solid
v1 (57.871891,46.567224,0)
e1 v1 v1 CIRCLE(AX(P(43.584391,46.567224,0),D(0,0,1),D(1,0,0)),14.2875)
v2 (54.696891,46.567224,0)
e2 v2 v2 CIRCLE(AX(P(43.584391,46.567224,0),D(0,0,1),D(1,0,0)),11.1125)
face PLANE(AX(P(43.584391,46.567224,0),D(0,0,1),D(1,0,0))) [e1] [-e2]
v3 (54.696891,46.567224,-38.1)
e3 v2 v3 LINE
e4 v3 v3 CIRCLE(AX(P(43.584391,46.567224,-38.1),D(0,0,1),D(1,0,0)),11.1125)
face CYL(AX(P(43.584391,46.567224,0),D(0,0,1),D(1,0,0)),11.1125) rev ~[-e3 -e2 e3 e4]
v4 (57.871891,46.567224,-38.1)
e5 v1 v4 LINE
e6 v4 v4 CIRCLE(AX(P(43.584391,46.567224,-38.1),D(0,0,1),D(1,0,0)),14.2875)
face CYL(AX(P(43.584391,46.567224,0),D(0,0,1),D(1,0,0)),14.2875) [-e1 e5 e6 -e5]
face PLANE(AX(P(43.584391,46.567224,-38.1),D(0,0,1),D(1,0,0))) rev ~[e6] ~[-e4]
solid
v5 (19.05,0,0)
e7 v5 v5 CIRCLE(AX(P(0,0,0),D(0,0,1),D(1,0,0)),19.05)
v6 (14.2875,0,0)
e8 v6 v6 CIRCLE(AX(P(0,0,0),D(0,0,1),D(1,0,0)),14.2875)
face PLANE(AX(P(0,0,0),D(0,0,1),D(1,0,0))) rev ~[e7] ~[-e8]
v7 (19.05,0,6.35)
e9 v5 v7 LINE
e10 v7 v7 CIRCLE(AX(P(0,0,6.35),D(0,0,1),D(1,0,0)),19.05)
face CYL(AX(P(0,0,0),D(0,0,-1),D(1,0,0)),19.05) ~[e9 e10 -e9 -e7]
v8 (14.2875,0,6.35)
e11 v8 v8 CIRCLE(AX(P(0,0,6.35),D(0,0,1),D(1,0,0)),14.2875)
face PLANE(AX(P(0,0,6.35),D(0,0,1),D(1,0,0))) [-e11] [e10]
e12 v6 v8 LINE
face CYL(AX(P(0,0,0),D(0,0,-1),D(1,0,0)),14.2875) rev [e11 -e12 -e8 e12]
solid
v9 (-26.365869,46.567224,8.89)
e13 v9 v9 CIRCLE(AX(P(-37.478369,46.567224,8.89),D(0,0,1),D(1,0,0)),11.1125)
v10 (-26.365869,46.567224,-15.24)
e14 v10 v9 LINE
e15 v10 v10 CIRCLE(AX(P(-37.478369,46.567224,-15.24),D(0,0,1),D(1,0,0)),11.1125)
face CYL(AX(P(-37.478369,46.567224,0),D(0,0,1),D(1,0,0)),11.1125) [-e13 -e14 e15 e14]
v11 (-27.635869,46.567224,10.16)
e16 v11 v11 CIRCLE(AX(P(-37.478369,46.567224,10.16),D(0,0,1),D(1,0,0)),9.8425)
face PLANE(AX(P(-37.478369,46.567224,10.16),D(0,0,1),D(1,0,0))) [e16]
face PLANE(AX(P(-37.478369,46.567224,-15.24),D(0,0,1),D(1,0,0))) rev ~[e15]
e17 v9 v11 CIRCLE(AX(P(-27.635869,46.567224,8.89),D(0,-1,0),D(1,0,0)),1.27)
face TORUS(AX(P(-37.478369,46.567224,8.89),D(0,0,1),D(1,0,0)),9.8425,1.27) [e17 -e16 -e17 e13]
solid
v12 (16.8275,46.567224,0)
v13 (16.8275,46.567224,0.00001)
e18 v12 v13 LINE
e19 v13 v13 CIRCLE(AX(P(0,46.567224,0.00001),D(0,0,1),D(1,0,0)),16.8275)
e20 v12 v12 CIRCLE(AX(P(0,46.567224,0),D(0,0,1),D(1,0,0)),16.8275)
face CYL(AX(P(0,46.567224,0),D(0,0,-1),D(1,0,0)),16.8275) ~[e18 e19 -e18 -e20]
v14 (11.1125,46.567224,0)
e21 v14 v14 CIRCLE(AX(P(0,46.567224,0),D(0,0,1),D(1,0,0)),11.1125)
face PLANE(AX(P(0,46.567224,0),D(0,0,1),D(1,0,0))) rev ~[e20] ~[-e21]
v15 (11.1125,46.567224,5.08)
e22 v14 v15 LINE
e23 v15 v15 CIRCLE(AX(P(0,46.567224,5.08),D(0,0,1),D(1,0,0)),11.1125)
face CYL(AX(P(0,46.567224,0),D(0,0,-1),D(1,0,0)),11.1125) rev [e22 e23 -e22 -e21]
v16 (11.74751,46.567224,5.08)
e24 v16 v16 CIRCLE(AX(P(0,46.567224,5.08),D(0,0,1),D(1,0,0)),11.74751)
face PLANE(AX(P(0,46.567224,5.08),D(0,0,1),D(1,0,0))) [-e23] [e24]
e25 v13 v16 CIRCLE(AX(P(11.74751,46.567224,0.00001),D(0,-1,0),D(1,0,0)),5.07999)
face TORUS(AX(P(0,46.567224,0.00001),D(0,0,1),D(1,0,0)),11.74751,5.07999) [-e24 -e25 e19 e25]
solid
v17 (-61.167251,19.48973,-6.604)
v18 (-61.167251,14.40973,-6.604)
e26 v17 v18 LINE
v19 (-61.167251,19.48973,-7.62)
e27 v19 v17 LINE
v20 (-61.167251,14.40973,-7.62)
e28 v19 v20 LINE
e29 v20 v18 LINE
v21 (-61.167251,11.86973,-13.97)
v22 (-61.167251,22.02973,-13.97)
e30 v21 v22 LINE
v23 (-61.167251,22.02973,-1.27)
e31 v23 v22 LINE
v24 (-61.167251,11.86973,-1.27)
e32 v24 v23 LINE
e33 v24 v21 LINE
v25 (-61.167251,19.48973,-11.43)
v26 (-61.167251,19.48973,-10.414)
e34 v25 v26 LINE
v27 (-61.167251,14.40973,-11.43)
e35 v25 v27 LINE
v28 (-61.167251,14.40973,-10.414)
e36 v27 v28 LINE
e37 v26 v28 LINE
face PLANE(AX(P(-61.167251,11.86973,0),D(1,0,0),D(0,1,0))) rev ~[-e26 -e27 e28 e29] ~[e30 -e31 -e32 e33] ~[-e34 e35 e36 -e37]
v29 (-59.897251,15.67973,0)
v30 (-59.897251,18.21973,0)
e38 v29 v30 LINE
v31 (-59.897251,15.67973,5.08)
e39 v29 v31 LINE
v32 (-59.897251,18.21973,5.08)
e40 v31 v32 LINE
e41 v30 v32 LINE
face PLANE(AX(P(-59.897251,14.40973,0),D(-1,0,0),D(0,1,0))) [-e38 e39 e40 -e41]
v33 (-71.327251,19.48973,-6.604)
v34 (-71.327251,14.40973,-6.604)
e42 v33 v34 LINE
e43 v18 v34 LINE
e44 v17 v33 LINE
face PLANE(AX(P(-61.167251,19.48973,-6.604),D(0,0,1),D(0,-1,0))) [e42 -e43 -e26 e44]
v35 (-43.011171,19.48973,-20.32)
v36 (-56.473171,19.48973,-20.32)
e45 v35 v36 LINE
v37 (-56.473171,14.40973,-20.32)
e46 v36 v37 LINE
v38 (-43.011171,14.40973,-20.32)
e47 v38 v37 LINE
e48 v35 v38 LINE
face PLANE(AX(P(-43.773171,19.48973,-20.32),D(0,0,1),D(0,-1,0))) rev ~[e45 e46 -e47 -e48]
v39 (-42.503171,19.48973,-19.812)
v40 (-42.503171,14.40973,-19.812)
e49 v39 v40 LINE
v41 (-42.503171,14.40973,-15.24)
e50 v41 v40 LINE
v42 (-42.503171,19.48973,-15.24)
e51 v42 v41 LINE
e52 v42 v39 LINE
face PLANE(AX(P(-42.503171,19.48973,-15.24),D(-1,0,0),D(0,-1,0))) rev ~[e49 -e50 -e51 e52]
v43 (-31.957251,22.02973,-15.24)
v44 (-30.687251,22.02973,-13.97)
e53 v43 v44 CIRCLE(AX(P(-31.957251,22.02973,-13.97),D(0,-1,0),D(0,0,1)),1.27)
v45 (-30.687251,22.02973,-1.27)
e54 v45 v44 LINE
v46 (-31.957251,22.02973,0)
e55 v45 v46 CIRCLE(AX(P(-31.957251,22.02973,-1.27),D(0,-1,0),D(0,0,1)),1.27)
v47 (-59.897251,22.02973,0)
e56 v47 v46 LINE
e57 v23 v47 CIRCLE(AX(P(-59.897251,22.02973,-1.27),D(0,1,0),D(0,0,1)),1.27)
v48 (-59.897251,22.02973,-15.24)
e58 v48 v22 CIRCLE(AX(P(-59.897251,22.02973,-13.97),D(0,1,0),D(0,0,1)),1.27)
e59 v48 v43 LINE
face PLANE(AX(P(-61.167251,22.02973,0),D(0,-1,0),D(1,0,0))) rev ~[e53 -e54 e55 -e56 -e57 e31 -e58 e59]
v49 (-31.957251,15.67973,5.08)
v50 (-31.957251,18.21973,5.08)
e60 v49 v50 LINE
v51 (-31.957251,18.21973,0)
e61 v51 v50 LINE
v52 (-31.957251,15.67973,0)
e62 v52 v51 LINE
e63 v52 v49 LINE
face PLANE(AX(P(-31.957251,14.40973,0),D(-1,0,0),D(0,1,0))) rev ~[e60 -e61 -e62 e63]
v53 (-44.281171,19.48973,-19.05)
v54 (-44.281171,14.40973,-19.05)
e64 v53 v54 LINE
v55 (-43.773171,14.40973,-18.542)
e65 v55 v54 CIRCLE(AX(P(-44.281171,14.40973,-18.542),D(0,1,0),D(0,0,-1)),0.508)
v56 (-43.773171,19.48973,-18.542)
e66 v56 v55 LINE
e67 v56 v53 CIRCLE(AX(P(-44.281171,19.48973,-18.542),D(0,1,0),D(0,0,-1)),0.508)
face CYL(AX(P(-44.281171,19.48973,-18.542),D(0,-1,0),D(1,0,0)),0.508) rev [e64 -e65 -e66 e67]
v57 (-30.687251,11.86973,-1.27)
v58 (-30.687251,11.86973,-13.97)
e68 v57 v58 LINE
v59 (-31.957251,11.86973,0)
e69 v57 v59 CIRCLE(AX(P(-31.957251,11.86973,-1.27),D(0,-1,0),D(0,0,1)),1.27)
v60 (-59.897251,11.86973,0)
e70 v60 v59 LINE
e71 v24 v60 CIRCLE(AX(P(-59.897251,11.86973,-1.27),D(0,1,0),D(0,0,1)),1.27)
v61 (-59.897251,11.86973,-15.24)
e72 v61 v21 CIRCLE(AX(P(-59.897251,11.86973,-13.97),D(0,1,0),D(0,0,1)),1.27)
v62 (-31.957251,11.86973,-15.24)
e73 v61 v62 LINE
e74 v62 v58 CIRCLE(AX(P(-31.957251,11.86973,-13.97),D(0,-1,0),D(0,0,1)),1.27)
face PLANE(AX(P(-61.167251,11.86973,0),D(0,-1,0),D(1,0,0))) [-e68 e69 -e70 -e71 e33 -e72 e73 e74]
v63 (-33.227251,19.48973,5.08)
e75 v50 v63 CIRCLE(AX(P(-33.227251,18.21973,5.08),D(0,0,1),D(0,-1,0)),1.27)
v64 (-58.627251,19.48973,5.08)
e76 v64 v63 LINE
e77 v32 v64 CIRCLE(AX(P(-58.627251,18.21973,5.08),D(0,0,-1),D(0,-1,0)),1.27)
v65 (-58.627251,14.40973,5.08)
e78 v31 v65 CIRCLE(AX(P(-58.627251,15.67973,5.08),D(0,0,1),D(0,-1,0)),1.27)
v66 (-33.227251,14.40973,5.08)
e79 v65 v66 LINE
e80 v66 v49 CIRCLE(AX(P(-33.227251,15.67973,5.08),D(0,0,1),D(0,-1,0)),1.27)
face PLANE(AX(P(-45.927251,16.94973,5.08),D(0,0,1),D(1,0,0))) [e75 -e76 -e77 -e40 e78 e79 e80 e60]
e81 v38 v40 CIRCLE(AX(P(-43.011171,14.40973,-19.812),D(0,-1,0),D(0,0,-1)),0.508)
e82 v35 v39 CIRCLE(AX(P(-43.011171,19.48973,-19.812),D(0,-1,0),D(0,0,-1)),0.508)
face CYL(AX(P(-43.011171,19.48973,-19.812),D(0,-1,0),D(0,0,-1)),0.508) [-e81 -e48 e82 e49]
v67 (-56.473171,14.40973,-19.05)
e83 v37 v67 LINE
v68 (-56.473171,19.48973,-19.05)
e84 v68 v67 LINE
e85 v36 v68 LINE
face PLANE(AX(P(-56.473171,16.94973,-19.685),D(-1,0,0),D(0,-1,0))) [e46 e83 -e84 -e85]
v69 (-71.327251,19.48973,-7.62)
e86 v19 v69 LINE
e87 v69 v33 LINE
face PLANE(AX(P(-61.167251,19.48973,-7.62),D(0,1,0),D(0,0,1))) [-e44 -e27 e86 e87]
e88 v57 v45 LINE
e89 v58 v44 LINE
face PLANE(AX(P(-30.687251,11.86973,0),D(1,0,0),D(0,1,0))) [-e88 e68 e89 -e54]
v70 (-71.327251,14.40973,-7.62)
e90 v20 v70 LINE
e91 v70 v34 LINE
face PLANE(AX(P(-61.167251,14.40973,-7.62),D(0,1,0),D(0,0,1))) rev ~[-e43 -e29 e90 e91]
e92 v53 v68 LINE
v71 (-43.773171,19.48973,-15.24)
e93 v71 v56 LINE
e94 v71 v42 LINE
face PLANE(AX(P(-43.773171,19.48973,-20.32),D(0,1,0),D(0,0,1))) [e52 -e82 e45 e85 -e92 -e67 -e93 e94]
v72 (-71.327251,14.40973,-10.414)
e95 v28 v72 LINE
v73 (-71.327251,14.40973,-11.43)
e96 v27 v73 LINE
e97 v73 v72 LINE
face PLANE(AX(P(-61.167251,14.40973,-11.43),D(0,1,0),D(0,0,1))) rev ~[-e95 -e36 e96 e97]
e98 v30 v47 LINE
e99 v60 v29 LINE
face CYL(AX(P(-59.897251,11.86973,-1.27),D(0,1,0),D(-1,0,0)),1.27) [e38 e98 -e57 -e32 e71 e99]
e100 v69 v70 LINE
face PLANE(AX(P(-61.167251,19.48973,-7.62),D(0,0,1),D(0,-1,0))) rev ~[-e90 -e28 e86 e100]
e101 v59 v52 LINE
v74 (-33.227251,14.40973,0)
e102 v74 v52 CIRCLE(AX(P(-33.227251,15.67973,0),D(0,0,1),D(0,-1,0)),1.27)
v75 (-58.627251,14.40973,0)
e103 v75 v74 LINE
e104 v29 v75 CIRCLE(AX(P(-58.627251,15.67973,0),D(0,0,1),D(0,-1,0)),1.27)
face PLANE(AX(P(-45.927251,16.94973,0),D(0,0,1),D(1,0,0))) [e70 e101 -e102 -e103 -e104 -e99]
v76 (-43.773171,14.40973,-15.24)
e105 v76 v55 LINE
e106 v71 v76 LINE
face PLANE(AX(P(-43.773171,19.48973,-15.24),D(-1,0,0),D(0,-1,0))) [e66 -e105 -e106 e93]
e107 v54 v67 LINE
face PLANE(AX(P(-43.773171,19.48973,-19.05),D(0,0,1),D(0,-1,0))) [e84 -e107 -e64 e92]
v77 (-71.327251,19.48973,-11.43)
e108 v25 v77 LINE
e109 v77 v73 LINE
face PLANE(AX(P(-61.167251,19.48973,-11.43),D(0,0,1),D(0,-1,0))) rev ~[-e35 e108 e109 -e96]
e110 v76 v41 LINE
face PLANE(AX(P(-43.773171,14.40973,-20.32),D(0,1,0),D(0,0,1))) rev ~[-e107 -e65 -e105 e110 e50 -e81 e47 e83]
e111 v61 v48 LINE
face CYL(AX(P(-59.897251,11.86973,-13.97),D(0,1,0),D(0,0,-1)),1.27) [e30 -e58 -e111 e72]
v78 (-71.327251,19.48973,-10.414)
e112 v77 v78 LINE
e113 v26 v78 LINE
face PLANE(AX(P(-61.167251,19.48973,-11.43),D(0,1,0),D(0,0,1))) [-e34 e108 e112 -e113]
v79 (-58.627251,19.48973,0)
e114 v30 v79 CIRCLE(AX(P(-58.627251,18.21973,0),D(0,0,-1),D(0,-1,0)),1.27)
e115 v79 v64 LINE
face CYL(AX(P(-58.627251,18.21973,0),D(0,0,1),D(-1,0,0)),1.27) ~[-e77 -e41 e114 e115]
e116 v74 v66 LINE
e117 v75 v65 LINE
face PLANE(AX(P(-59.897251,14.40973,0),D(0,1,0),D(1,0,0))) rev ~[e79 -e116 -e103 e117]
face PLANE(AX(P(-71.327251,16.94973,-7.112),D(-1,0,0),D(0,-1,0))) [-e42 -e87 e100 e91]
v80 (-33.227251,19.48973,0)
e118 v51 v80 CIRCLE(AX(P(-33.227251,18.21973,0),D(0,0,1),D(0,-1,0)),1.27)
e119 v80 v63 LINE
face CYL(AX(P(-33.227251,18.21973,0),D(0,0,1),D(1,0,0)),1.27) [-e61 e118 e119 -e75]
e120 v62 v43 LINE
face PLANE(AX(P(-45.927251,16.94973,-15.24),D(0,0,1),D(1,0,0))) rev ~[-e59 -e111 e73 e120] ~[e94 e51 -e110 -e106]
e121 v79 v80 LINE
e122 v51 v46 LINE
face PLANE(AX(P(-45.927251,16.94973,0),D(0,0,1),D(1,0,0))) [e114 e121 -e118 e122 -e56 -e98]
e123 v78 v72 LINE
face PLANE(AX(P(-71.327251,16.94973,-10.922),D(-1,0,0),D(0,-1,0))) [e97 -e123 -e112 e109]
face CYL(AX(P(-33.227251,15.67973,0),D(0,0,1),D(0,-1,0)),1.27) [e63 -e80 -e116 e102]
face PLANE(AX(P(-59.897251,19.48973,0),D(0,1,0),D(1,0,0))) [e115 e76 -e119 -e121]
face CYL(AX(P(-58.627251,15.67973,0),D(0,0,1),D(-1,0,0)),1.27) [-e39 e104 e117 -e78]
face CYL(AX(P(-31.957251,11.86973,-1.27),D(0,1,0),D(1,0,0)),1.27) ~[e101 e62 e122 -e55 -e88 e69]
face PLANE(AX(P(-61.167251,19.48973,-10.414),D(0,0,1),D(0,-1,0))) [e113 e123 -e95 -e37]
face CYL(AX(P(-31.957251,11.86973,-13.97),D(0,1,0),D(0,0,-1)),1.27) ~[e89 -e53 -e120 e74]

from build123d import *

# Parameters (mm, degrees)
F0_W      = 30.48
F0_H      = 10.16
F1_DEPTH  = 15.24
F2_W      = 5.08
F2_H      = 1.016
F3_DEPTH  = 10.16
F4_W      = 1.27
F4_H      = 5.08
F5_DEPTH  = 5.08
F6_W      = 5.08
F6_H      = 1.27
F7_DEPTH  = 12.7
F8_R      = 0.508
F9_R      = 1.27
F10_W     = 27.94
F10_H     = 5.08
F11_DEPTH = 5.08
F12_R     = 1.27
F13_R     = 14.2875
F13_R_2   = 11.1125
F14_DEPTH = 38.1
F13_R_3   = 16.8275
F15_DEPTH = 5.08
F16_DEPTH = 10.16
F17_DEPTH = 15.24
F18_R     = 1.27
F19_R     = 5.07999
F13_R_4   = 19.05
F20_DEPTH = 6.35


# Not quite as in the source:
# - a fillet or chamfer is up to 0.001 mm smaller than in the source, because OpenCascade refuses the exact size


with BuildPart() as f1:
    # F0 (on Top) → F1 (new body)
    with BuildSketch(Plane.XY):
        with Locations((-45.9272513187, 16.9497304279)):
            Rectangle(F0_W, F0_H)
    extrude(amount=-F1_DEPTH)

    # F2 (on face) → F3 (join)
    with BuildSketch(Plane(origin=(-61.1672513187, 0, 0), x_dir=(0, -1, 0), z_dir=(-1, 0, 0))):
        with Locations((-16.9497304279, -7.112)):
            Rectangle(F2_W, F2_H)
        with Locations((-16.9497304279, -10.922)):
            Rectangle(F2_W, F2_H)
    extrude(amount=F3_DEPTH)

    # F4 (on face) → F5 (join)
    with BuildSketch(Plane(origin=(0, 0, -15.24), x_dir=(1, 0, 0), z_dir=(0, 0, -1))):
        with Locations((-43.1381706691, -16.9497304279)):
            Rectangle(F4_W, F4_H)
    extrude(amount=F5_DEPTH)

    # F6 (on face) → F7 (join)
    with BuildSketch(Plane(origin=(-43.7731706691, 0, 0), x_dir=(0, -1, 0), z_dir=(-1, 0, 0))):
        with Locations((-16.9497304279, -19.685)):
            Rectangle(F6_W, F6_H)
    extrude(amount=F7_DEPTH)

    # F8
    f8_edges = [f1.edges().sort_by_distance(p)[0] for p in [
        (-42.503171, 16.94973, -20.32),
        (-43.773171, 16.94973, -19.05),
    ]]
    fillet(f8_edges, radius=F8_R)

    # F9
    f9_edges = [f1.edges().sort_by_distance(p)[0] for p in [
        (-30.687251, 16.94973, -15.24),
        (-61.167251, 16.94973, -15.24),
        (-30.687251, 16.94973, 0),
        (-61.167251, 16.94973, 0),
    ]]
    fillet(f9_edges, radius=F9_R)

    # F10 (on face) → F11 (join)
    with BuildSketch(Plane.XY):
        with Locations((-45.9272513187, 16.9497304279)):
            Rectangle(F10_W, F10_H)
    extrude(amount=F11_DEPTH)

    # F12
    f12_edges = [f1.edges().sort_by_distance(p)[0] for p in [
        (-31.957251, 14.40973, 2.54),
        (-59.897251, 14.40973, 2.54),
        (-59.897251, 19.48973, 2.54),
        (-31.957251, 19.48973, 2.54),
    ]]
    fillet(f12_edges, radius=F12_R)


with BuildPart() as f14:
    # F13 (on Top) → F14 (new body)
    with BuildSketch(Plane.XY):
        with Locations((43.5843914747, 46.5672239661)):
            Circle(F13_R)
        with Locations((43.5843914747, 46.5672239661)):
            Circle(F13_R_2, mode=Mode.SUBTRACT)
    extrude(amount=-F14_DEPTH)


with BuildPart() as f15:
    # F13 (on Top) → F15 (new body)
    with BuildSketch(Plane.XY):
        with Locations((0, 46.5672239661)):
            Circle(F13_R_3)
        with Locations((0, 46.5672239661)):
            Circle(F13_R_2, mode=Mode.SUBTRACT)
    extrude(amount=F15_DEPTH)

    # F19 (radius 5.08 in the source; OpenCascade refuses exactly that, so slightly less here)
    f19_edges = [f15.edges().sort_by_distance(p)[0] for p in [
        (-16.8275, 46.567224, 5.08),
    ]]
    fillet(f19_edges, radius=F19_R)


with BuildPart() as f16:
    # F13 (on Top) → F16 (new body)
    with BuildSketch(Plane.XY):
        with Locations((-37.4783687294, 46.5672239661)):
            Circle(F13_R_2)
    extrude(amount=F16_DEPTH)

    # F17 (add): a face of the model
    f17_faces = [f16.faces().sort_by_distance(p)[0] for p in [
        (-37.4783687294, 46.5672239661, 0),
    ]]
    extrude(f17_faces, amount=F17_DEPTH)

    # F18
    f18_edges = [f16.edges().sort_by_distance(p)[0] for p in [
        (-48.590869, 46.567224, 10.16),
    ]]
    fillet(f18_edges, radius=F18_R)


with BuildPart() as f20:
    # F13 (on Top) → F20 (new body)
    with BuildSketch(Plane.XY):
        Circle(F13_R_4)
        Circle(F13_R, mode=Mode.SUBTRACT)
    extrude(amount=F20_DEPTH)


solid = Compound([f1.part, f14.part, f15.part, f16.part, f20.part])
